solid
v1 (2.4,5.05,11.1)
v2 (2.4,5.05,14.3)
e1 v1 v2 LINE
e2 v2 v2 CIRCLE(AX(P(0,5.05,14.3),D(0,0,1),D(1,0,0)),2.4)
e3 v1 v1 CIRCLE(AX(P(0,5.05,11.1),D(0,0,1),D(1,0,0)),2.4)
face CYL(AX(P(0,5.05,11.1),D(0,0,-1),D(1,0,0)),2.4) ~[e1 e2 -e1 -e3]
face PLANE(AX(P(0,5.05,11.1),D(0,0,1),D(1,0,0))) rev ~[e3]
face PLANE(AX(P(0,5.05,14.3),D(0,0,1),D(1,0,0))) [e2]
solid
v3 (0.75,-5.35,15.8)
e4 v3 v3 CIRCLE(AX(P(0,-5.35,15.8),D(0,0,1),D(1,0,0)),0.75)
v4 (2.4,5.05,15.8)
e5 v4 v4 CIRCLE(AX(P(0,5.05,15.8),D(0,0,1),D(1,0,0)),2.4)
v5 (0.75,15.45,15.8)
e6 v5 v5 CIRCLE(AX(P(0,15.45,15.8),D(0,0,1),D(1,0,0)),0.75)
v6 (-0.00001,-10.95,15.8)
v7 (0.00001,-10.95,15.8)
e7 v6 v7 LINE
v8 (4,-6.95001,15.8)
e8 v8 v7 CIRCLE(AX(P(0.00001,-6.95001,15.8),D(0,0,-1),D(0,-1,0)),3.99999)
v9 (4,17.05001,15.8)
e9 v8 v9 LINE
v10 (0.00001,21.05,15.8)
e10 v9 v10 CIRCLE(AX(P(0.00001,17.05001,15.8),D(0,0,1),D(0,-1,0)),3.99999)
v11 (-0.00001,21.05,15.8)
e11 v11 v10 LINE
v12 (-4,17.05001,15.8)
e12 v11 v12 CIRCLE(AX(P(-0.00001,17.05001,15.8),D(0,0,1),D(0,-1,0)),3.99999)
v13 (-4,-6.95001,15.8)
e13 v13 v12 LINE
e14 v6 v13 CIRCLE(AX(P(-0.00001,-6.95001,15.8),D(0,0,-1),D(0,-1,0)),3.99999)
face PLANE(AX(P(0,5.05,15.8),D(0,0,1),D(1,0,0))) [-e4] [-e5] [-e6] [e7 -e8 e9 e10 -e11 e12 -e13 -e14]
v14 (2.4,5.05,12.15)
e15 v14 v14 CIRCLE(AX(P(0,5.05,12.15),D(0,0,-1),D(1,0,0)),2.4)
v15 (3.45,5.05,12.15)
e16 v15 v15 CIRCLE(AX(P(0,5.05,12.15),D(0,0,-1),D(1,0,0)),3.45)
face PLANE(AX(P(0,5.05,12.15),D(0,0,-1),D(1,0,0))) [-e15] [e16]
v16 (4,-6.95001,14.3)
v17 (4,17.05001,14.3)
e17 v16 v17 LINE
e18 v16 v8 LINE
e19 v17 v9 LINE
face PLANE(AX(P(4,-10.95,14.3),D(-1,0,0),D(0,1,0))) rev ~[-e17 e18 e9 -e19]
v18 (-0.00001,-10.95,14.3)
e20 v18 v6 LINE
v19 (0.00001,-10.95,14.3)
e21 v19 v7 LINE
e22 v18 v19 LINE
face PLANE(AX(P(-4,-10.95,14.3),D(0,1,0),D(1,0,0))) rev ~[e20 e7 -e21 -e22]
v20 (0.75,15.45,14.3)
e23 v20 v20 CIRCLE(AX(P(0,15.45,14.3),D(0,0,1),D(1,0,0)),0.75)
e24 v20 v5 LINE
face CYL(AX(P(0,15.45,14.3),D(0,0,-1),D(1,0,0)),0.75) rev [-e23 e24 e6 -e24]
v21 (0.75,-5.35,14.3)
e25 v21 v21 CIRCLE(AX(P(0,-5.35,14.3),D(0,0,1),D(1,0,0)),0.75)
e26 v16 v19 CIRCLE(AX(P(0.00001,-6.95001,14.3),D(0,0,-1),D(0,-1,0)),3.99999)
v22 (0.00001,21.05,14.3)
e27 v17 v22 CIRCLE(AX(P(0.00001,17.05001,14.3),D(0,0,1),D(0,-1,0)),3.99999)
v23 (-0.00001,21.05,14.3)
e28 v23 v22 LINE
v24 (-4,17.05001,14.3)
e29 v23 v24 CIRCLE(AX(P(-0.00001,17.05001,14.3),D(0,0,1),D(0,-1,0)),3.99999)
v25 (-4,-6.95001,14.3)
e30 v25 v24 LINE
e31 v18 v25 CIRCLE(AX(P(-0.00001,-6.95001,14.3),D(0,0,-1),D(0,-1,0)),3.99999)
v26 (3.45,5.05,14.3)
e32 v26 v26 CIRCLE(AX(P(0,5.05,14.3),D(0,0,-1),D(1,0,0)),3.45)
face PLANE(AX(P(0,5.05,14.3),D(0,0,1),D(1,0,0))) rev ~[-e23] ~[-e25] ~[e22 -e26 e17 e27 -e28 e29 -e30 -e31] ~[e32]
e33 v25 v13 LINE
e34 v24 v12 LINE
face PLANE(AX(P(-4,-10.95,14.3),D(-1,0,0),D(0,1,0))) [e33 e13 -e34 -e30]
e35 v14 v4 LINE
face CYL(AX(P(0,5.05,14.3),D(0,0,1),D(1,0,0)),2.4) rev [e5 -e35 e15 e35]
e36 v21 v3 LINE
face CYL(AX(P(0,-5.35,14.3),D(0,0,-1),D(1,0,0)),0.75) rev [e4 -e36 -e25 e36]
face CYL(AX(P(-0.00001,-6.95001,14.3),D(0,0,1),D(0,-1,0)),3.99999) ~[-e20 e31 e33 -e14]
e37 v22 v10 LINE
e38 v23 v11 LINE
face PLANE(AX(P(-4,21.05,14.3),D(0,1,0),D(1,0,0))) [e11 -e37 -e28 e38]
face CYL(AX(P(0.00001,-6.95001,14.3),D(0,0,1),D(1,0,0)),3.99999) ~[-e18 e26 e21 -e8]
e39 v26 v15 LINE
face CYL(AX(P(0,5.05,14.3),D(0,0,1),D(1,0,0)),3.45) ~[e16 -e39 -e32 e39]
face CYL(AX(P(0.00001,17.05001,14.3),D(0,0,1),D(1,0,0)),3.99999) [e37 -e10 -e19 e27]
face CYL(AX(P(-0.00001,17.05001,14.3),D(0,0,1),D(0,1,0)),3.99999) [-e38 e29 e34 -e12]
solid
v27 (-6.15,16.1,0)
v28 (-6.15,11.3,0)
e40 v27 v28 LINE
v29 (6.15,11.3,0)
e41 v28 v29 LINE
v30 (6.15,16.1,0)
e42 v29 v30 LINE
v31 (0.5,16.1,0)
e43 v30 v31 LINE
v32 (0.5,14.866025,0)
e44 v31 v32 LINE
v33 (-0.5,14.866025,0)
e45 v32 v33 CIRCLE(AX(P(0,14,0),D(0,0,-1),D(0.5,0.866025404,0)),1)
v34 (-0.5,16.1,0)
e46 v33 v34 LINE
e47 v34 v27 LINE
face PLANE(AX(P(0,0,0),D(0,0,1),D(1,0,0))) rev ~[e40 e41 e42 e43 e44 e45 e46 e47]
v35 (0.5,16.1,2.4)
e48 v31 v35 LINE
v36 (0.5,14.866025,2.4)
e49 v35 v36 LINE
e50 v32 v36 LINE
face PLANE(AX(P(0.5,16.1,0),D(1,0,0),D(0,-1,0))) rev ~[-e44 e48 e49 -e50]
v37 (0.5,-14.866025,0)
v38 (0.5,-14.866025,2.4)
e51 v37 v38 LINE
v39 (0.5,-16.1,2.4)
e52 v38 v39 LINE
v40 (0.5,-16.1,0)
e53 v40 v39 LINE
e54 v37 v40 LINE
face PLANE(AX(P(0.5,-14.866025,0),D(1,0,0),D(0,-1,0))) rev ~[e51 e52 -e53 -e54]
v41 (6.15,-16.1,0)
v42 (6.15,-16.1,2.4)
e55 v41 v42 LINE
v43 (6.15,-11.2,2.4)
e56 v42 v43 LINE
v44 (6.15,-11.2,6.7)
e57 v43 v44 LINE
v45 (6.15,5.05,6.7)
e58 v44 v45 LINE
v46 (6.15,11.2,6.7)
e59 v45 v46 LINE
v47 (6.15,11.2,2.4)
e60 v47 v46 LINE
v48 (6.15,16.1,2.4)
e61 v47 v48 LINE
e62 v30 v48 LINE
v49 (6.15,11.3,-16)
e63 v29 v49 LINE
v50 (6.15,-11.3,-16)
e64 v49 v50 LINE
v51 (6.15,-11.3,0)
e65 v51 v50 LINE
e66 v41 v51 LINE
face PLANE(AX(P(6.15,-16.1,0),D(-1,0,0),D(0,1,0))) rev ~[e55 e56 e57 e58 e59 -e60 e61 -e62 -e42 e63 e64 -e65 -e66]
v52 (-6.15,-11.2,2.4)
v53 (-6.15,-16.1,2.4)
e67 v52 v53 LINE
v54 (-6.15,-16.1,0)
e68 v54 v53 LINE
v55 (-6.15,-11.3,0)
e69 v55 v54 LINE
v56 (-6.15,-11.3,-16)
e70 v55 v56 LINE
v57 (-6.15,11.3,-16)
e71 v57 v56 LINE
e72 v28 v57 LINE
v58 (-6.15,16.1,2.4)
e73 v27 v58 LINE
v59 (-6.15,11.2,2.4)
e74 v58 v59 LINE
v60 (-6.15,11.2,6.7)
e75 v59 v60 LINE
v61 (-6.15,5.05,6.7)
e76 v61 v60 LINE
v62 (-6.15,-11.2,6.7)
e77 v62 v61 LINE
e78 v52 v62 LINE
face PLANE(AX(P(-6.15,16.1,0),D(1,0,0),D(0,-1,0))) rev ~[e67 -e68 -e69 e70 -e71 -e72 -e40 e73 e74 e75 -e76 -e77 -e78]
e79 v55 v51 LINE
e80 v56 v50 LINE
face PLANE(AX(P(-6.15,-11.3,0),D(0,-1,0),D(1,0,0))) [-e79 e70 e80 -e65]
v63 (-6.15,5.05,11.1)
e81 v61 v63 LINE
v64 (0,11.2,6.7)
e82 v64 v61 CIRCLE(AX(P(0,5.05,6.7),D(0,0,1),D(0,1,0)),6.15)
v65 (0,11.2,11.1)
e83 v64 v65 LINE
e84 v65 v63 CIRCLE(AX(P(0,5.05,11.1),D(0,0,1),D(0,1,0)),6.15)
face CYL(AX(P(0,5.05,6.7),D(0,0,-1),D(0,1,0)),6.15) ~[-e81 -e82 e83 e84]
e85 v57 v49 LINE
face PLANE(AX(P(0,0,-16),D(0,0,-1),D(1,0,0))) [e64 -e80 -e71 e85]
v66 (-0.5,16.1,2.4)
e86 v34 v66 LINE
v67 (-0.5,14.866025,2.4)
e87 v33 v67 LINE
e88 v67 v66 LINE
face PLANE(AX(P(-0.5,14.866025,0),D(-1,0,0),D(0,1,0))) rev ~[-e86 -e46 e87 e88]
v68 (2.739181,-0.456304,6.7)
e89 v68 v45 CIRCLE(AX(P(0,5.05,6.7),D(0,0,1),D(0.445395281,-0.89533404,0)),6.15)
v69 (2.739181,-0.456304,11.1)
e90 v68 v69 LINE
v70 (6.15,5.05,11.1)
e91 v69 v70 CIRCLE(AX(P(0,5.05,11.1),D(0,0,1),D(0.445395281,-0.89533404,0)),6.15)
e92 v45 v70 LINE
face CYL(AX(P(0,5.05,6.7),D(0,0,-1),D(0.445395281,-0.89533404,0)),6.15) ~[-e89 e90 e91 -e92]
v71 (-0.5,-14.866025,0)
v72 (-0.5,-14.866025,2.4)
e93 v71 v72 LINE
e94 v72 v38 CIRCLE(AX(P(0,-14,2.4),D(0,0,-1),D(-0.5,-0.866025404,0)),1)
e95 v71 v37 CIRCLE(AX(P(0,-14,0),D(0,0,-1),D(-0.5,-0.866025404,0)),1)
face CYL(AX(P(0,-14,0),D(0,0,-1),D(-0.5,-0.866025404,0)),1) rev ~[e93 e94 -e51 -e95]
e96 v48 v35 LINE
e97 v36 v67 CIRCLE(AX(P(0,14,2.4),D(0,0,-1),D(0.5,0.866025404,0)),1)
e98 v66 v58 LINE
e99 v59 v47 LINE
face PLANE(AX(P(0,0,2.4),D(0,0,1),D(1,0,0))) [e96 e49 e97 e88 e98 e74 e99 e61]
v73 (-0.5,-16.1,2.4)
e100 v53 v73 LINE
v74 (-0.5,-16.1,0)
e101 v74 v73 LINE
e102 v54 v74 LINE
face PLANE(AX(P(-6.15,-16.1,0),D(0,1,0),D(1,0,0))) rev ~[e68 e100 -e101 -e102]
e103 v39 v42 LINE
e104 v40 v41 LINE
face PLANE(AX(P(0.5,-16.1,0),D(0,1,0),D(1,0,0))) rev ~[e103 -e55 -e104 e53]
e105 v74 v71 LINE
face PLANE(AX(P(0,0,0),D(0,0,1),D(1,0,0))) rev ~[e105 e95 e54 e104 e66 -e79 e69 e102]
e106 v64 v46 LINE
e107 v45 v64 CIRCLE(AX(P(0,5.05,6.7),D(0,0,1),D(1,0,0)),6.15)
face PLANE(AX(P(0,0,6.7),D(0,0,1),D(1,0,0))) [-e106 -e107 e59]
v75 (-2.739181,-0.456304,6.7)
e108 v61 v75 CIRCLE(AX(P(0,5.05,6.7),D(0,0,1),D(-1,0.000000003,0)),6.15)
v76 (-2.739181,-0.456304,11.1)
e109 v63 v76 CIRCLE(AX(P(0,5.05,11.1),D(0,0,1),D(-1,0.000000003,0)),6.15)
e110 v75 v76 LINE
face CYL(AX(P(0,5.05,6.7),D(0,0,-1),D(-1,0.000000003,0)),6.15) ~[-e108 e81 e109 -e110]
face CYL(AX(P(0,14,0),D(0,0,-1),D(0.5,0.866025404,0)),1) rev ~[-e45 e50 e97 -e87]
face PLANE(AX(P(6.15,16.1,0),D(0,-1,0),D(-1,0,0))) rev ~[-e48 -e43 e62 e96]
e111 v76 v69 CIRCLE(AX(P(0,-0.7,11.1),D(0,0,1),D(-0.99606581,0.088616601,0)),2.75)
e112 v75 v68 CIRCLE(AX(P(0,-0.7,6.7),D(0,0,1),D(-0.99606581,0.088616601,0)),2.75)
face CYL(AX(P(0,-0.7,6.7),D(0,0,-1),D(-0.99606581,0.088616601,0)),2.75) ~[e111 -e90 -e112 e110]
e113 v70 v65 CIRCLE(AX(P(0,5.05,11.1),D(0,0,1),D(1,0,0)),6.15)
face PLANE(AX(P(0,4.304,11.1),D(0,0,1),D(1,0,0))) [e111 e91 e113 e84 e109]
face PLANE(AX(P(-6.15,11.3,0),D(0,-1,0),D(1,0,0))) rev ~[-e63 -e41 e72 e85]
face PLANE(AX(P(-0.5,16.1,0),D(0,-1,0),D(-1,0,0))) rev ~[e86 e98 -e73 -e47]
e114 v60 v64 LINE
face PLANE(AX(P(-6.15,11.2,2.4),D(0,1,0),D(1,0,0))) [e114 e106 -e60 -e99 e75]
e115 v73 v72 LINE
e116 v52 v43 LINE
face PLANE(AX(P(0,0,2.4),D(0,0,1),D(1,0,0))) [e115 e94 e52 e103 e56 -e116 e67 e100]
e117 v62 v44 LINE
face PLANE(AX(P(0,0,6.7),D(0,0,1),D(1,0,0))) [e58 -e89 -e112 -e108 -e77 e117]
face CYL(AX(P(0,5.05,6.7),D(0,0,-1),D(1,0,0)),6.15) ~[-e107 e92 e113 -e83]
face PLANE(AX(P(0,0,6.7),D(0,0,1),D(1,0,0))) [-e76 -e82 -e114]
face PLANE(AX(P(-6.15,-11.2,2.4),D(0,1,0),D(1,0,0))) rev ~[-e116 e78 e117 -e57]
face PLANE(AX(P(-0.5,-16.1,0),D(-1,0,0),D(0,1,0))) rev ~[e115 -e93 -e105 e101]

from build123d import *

# Parameters (mm, degrees)
F1_DEPTH  = 2.4
F2_W      = 12.3
F2_H      = 22.4
F3_DEPTH  = 4.3
F5_DEPTH  = 4.4
F6_W      = 12.3
F6_H      = 22.6
F7_DEPTH  = 16
F8_R      = 2.4
F9_DEPTH  = 3.2
F10_W     = 8
F10_H     = 32
F10_R     = 0.75
F10_R_2   = 2.4
F11_DEPTH = 1.5
F12_R     = 3.45
F12_R_2   = 2.4
F13_DEPTH = 2.15
F14_R     = 3.99999


# Not quite as in the source:
# - a fillet or chamfer is up to 0.001 mm smaller than in the source, because OpenCascade refuses the exact size


with BuildPart() as f1:
    # F0 (on Top) → F1 (new body)
    with BuildSketch(Plane.XY):
        with BuildLine():
            Line((0.5, -16.1), (6.15, -16.1))
            Line((6.15, -16.1), (6.15, 16.1))
            Line((6.15, 16.1), (0.5, 16.1))
            Line((0.5, 16.1), (0.5, 14.8660254038))
            ThreePointArc((0.5, 14.8660254038), (0, 13), (-0.5, 14.8660254038))
            Line((-0.5, 14.8660254038), (-0.5, 16.1))
            Line((-0.5, 16.1), (-6.15, 16.1))
            Line((-6.15, 16.1), (-6.15, -16.1))
            Line((-6.15, -16.1), (-0.5, -16.1))
            Line((-0.5, -16.1), (-0.5, -14.8660254038))
            ThreePointArc((-0.5, -14.8660254038), (0, -13), (0.5, -14.8660254038))
            Line((0.5, -14.8660254038), (0.5, -16.1))
        make_face()
    extrude(amount=F1_DEPTH)

    # F2 (on face) → F3 (join)
    with BuildSketch(Plane.XY.offset(2.4)):
        Rectangle(F2_W, F2_H)
    extrude(amount=F3_DEPTH)

    # F4 (on face) → F5 (join)
    with BuildSketch(Plane.XY.offset(6.7)):
        with BuildLine():
            ThreePointArc((-6.15, 5.0500000209), (-5.2282149501, 1.8114403764), (-2.7391809778, -0.4563043478))
            ThreePointArc((-2.7391809778, -0.4563043478), (0, -3.45), (2.7391809778, -0.4563043478))
            ThreePointArc((2.7391809778, -0.4563043478), (5.2282149446, 1.8114403675), (6.15, 5.05))
            ThreePointArc((6.15, 5.05), (4.3487067043, 9.3987067043), (0, 11.2))
            ThreePointArc((0, 11.2), (-4.3487066969, 9.3987067117), (-6.15, 5.0500000209))
        make_face()
    extrude(amount=F5_DEPTH)

    # F6 (on face) → F7 (join)
    with BuildSketch(Plane(origin=(0, 0, 0), x_dir=(1, 0, 0), z_dir=(0, 0, -1))):
        Rectangle(F6_W, F6_H)
    extrude(amount=F7_DEPTH)


with BuildPart() as f9:
    # F8 (on face) → F9 (new body)
    with BuildSketch(Plane.XY.offset(11.1)):
        with Locations((0, 5.05)):
            Circle(F8_R)
    extrude(amount=F9_DEPTH)


with BuildPart() as f11:
    # F10 (on face) → F11 (new body)
    with BuildSketch(Plane.XY.offset(14.3)):
        with Locations((0, 5.05)):
            Rectangle(F10_W, F10_H)
        with Locations((0, -5.35)):
            Circle(F10_R, mode=Mode.SUBTRACT)
        with Locations((0, 5.05)):
            Circle(F10_R_2, mode=Mode.SUBTRACT)
        with Locations((0, 15.45)):
            Circle(F10_R, mode=Mode.SUBTRACT)
    extrude(amount=F11_DEPTH)

    # F12 (on face) → F13 (join)
    with BuildSketch(Plane(origin=(0, 0, 14.3), x_dir=(1, 0, 0), z_dir=(0, 0, -1))):
        with Locations((0, -5.05)):
            Circle(F12_R)
        with Locations((0, -5.05)):
            Circle(F12_R_2, mode=Mode.SUBTRACT)
    extrude(amount=F13_DEPTH)

    # F14 (radius 4 in the source; OpenCascade refuses exactly that, so slightly less here)
    f14_edges = [f11.edges().sort_by_distance(p)[0] for p in [
        (4, 21.05, 15.05),
        (-4, 21.05, 15.05),
        (4, -10.95, 15.05),
        (-4, -10.95, 15.05),
    ]]
    fillet(f14_edges, radius=F14_R)


solid = Compound([f1.part, f9.part, f11.part])
